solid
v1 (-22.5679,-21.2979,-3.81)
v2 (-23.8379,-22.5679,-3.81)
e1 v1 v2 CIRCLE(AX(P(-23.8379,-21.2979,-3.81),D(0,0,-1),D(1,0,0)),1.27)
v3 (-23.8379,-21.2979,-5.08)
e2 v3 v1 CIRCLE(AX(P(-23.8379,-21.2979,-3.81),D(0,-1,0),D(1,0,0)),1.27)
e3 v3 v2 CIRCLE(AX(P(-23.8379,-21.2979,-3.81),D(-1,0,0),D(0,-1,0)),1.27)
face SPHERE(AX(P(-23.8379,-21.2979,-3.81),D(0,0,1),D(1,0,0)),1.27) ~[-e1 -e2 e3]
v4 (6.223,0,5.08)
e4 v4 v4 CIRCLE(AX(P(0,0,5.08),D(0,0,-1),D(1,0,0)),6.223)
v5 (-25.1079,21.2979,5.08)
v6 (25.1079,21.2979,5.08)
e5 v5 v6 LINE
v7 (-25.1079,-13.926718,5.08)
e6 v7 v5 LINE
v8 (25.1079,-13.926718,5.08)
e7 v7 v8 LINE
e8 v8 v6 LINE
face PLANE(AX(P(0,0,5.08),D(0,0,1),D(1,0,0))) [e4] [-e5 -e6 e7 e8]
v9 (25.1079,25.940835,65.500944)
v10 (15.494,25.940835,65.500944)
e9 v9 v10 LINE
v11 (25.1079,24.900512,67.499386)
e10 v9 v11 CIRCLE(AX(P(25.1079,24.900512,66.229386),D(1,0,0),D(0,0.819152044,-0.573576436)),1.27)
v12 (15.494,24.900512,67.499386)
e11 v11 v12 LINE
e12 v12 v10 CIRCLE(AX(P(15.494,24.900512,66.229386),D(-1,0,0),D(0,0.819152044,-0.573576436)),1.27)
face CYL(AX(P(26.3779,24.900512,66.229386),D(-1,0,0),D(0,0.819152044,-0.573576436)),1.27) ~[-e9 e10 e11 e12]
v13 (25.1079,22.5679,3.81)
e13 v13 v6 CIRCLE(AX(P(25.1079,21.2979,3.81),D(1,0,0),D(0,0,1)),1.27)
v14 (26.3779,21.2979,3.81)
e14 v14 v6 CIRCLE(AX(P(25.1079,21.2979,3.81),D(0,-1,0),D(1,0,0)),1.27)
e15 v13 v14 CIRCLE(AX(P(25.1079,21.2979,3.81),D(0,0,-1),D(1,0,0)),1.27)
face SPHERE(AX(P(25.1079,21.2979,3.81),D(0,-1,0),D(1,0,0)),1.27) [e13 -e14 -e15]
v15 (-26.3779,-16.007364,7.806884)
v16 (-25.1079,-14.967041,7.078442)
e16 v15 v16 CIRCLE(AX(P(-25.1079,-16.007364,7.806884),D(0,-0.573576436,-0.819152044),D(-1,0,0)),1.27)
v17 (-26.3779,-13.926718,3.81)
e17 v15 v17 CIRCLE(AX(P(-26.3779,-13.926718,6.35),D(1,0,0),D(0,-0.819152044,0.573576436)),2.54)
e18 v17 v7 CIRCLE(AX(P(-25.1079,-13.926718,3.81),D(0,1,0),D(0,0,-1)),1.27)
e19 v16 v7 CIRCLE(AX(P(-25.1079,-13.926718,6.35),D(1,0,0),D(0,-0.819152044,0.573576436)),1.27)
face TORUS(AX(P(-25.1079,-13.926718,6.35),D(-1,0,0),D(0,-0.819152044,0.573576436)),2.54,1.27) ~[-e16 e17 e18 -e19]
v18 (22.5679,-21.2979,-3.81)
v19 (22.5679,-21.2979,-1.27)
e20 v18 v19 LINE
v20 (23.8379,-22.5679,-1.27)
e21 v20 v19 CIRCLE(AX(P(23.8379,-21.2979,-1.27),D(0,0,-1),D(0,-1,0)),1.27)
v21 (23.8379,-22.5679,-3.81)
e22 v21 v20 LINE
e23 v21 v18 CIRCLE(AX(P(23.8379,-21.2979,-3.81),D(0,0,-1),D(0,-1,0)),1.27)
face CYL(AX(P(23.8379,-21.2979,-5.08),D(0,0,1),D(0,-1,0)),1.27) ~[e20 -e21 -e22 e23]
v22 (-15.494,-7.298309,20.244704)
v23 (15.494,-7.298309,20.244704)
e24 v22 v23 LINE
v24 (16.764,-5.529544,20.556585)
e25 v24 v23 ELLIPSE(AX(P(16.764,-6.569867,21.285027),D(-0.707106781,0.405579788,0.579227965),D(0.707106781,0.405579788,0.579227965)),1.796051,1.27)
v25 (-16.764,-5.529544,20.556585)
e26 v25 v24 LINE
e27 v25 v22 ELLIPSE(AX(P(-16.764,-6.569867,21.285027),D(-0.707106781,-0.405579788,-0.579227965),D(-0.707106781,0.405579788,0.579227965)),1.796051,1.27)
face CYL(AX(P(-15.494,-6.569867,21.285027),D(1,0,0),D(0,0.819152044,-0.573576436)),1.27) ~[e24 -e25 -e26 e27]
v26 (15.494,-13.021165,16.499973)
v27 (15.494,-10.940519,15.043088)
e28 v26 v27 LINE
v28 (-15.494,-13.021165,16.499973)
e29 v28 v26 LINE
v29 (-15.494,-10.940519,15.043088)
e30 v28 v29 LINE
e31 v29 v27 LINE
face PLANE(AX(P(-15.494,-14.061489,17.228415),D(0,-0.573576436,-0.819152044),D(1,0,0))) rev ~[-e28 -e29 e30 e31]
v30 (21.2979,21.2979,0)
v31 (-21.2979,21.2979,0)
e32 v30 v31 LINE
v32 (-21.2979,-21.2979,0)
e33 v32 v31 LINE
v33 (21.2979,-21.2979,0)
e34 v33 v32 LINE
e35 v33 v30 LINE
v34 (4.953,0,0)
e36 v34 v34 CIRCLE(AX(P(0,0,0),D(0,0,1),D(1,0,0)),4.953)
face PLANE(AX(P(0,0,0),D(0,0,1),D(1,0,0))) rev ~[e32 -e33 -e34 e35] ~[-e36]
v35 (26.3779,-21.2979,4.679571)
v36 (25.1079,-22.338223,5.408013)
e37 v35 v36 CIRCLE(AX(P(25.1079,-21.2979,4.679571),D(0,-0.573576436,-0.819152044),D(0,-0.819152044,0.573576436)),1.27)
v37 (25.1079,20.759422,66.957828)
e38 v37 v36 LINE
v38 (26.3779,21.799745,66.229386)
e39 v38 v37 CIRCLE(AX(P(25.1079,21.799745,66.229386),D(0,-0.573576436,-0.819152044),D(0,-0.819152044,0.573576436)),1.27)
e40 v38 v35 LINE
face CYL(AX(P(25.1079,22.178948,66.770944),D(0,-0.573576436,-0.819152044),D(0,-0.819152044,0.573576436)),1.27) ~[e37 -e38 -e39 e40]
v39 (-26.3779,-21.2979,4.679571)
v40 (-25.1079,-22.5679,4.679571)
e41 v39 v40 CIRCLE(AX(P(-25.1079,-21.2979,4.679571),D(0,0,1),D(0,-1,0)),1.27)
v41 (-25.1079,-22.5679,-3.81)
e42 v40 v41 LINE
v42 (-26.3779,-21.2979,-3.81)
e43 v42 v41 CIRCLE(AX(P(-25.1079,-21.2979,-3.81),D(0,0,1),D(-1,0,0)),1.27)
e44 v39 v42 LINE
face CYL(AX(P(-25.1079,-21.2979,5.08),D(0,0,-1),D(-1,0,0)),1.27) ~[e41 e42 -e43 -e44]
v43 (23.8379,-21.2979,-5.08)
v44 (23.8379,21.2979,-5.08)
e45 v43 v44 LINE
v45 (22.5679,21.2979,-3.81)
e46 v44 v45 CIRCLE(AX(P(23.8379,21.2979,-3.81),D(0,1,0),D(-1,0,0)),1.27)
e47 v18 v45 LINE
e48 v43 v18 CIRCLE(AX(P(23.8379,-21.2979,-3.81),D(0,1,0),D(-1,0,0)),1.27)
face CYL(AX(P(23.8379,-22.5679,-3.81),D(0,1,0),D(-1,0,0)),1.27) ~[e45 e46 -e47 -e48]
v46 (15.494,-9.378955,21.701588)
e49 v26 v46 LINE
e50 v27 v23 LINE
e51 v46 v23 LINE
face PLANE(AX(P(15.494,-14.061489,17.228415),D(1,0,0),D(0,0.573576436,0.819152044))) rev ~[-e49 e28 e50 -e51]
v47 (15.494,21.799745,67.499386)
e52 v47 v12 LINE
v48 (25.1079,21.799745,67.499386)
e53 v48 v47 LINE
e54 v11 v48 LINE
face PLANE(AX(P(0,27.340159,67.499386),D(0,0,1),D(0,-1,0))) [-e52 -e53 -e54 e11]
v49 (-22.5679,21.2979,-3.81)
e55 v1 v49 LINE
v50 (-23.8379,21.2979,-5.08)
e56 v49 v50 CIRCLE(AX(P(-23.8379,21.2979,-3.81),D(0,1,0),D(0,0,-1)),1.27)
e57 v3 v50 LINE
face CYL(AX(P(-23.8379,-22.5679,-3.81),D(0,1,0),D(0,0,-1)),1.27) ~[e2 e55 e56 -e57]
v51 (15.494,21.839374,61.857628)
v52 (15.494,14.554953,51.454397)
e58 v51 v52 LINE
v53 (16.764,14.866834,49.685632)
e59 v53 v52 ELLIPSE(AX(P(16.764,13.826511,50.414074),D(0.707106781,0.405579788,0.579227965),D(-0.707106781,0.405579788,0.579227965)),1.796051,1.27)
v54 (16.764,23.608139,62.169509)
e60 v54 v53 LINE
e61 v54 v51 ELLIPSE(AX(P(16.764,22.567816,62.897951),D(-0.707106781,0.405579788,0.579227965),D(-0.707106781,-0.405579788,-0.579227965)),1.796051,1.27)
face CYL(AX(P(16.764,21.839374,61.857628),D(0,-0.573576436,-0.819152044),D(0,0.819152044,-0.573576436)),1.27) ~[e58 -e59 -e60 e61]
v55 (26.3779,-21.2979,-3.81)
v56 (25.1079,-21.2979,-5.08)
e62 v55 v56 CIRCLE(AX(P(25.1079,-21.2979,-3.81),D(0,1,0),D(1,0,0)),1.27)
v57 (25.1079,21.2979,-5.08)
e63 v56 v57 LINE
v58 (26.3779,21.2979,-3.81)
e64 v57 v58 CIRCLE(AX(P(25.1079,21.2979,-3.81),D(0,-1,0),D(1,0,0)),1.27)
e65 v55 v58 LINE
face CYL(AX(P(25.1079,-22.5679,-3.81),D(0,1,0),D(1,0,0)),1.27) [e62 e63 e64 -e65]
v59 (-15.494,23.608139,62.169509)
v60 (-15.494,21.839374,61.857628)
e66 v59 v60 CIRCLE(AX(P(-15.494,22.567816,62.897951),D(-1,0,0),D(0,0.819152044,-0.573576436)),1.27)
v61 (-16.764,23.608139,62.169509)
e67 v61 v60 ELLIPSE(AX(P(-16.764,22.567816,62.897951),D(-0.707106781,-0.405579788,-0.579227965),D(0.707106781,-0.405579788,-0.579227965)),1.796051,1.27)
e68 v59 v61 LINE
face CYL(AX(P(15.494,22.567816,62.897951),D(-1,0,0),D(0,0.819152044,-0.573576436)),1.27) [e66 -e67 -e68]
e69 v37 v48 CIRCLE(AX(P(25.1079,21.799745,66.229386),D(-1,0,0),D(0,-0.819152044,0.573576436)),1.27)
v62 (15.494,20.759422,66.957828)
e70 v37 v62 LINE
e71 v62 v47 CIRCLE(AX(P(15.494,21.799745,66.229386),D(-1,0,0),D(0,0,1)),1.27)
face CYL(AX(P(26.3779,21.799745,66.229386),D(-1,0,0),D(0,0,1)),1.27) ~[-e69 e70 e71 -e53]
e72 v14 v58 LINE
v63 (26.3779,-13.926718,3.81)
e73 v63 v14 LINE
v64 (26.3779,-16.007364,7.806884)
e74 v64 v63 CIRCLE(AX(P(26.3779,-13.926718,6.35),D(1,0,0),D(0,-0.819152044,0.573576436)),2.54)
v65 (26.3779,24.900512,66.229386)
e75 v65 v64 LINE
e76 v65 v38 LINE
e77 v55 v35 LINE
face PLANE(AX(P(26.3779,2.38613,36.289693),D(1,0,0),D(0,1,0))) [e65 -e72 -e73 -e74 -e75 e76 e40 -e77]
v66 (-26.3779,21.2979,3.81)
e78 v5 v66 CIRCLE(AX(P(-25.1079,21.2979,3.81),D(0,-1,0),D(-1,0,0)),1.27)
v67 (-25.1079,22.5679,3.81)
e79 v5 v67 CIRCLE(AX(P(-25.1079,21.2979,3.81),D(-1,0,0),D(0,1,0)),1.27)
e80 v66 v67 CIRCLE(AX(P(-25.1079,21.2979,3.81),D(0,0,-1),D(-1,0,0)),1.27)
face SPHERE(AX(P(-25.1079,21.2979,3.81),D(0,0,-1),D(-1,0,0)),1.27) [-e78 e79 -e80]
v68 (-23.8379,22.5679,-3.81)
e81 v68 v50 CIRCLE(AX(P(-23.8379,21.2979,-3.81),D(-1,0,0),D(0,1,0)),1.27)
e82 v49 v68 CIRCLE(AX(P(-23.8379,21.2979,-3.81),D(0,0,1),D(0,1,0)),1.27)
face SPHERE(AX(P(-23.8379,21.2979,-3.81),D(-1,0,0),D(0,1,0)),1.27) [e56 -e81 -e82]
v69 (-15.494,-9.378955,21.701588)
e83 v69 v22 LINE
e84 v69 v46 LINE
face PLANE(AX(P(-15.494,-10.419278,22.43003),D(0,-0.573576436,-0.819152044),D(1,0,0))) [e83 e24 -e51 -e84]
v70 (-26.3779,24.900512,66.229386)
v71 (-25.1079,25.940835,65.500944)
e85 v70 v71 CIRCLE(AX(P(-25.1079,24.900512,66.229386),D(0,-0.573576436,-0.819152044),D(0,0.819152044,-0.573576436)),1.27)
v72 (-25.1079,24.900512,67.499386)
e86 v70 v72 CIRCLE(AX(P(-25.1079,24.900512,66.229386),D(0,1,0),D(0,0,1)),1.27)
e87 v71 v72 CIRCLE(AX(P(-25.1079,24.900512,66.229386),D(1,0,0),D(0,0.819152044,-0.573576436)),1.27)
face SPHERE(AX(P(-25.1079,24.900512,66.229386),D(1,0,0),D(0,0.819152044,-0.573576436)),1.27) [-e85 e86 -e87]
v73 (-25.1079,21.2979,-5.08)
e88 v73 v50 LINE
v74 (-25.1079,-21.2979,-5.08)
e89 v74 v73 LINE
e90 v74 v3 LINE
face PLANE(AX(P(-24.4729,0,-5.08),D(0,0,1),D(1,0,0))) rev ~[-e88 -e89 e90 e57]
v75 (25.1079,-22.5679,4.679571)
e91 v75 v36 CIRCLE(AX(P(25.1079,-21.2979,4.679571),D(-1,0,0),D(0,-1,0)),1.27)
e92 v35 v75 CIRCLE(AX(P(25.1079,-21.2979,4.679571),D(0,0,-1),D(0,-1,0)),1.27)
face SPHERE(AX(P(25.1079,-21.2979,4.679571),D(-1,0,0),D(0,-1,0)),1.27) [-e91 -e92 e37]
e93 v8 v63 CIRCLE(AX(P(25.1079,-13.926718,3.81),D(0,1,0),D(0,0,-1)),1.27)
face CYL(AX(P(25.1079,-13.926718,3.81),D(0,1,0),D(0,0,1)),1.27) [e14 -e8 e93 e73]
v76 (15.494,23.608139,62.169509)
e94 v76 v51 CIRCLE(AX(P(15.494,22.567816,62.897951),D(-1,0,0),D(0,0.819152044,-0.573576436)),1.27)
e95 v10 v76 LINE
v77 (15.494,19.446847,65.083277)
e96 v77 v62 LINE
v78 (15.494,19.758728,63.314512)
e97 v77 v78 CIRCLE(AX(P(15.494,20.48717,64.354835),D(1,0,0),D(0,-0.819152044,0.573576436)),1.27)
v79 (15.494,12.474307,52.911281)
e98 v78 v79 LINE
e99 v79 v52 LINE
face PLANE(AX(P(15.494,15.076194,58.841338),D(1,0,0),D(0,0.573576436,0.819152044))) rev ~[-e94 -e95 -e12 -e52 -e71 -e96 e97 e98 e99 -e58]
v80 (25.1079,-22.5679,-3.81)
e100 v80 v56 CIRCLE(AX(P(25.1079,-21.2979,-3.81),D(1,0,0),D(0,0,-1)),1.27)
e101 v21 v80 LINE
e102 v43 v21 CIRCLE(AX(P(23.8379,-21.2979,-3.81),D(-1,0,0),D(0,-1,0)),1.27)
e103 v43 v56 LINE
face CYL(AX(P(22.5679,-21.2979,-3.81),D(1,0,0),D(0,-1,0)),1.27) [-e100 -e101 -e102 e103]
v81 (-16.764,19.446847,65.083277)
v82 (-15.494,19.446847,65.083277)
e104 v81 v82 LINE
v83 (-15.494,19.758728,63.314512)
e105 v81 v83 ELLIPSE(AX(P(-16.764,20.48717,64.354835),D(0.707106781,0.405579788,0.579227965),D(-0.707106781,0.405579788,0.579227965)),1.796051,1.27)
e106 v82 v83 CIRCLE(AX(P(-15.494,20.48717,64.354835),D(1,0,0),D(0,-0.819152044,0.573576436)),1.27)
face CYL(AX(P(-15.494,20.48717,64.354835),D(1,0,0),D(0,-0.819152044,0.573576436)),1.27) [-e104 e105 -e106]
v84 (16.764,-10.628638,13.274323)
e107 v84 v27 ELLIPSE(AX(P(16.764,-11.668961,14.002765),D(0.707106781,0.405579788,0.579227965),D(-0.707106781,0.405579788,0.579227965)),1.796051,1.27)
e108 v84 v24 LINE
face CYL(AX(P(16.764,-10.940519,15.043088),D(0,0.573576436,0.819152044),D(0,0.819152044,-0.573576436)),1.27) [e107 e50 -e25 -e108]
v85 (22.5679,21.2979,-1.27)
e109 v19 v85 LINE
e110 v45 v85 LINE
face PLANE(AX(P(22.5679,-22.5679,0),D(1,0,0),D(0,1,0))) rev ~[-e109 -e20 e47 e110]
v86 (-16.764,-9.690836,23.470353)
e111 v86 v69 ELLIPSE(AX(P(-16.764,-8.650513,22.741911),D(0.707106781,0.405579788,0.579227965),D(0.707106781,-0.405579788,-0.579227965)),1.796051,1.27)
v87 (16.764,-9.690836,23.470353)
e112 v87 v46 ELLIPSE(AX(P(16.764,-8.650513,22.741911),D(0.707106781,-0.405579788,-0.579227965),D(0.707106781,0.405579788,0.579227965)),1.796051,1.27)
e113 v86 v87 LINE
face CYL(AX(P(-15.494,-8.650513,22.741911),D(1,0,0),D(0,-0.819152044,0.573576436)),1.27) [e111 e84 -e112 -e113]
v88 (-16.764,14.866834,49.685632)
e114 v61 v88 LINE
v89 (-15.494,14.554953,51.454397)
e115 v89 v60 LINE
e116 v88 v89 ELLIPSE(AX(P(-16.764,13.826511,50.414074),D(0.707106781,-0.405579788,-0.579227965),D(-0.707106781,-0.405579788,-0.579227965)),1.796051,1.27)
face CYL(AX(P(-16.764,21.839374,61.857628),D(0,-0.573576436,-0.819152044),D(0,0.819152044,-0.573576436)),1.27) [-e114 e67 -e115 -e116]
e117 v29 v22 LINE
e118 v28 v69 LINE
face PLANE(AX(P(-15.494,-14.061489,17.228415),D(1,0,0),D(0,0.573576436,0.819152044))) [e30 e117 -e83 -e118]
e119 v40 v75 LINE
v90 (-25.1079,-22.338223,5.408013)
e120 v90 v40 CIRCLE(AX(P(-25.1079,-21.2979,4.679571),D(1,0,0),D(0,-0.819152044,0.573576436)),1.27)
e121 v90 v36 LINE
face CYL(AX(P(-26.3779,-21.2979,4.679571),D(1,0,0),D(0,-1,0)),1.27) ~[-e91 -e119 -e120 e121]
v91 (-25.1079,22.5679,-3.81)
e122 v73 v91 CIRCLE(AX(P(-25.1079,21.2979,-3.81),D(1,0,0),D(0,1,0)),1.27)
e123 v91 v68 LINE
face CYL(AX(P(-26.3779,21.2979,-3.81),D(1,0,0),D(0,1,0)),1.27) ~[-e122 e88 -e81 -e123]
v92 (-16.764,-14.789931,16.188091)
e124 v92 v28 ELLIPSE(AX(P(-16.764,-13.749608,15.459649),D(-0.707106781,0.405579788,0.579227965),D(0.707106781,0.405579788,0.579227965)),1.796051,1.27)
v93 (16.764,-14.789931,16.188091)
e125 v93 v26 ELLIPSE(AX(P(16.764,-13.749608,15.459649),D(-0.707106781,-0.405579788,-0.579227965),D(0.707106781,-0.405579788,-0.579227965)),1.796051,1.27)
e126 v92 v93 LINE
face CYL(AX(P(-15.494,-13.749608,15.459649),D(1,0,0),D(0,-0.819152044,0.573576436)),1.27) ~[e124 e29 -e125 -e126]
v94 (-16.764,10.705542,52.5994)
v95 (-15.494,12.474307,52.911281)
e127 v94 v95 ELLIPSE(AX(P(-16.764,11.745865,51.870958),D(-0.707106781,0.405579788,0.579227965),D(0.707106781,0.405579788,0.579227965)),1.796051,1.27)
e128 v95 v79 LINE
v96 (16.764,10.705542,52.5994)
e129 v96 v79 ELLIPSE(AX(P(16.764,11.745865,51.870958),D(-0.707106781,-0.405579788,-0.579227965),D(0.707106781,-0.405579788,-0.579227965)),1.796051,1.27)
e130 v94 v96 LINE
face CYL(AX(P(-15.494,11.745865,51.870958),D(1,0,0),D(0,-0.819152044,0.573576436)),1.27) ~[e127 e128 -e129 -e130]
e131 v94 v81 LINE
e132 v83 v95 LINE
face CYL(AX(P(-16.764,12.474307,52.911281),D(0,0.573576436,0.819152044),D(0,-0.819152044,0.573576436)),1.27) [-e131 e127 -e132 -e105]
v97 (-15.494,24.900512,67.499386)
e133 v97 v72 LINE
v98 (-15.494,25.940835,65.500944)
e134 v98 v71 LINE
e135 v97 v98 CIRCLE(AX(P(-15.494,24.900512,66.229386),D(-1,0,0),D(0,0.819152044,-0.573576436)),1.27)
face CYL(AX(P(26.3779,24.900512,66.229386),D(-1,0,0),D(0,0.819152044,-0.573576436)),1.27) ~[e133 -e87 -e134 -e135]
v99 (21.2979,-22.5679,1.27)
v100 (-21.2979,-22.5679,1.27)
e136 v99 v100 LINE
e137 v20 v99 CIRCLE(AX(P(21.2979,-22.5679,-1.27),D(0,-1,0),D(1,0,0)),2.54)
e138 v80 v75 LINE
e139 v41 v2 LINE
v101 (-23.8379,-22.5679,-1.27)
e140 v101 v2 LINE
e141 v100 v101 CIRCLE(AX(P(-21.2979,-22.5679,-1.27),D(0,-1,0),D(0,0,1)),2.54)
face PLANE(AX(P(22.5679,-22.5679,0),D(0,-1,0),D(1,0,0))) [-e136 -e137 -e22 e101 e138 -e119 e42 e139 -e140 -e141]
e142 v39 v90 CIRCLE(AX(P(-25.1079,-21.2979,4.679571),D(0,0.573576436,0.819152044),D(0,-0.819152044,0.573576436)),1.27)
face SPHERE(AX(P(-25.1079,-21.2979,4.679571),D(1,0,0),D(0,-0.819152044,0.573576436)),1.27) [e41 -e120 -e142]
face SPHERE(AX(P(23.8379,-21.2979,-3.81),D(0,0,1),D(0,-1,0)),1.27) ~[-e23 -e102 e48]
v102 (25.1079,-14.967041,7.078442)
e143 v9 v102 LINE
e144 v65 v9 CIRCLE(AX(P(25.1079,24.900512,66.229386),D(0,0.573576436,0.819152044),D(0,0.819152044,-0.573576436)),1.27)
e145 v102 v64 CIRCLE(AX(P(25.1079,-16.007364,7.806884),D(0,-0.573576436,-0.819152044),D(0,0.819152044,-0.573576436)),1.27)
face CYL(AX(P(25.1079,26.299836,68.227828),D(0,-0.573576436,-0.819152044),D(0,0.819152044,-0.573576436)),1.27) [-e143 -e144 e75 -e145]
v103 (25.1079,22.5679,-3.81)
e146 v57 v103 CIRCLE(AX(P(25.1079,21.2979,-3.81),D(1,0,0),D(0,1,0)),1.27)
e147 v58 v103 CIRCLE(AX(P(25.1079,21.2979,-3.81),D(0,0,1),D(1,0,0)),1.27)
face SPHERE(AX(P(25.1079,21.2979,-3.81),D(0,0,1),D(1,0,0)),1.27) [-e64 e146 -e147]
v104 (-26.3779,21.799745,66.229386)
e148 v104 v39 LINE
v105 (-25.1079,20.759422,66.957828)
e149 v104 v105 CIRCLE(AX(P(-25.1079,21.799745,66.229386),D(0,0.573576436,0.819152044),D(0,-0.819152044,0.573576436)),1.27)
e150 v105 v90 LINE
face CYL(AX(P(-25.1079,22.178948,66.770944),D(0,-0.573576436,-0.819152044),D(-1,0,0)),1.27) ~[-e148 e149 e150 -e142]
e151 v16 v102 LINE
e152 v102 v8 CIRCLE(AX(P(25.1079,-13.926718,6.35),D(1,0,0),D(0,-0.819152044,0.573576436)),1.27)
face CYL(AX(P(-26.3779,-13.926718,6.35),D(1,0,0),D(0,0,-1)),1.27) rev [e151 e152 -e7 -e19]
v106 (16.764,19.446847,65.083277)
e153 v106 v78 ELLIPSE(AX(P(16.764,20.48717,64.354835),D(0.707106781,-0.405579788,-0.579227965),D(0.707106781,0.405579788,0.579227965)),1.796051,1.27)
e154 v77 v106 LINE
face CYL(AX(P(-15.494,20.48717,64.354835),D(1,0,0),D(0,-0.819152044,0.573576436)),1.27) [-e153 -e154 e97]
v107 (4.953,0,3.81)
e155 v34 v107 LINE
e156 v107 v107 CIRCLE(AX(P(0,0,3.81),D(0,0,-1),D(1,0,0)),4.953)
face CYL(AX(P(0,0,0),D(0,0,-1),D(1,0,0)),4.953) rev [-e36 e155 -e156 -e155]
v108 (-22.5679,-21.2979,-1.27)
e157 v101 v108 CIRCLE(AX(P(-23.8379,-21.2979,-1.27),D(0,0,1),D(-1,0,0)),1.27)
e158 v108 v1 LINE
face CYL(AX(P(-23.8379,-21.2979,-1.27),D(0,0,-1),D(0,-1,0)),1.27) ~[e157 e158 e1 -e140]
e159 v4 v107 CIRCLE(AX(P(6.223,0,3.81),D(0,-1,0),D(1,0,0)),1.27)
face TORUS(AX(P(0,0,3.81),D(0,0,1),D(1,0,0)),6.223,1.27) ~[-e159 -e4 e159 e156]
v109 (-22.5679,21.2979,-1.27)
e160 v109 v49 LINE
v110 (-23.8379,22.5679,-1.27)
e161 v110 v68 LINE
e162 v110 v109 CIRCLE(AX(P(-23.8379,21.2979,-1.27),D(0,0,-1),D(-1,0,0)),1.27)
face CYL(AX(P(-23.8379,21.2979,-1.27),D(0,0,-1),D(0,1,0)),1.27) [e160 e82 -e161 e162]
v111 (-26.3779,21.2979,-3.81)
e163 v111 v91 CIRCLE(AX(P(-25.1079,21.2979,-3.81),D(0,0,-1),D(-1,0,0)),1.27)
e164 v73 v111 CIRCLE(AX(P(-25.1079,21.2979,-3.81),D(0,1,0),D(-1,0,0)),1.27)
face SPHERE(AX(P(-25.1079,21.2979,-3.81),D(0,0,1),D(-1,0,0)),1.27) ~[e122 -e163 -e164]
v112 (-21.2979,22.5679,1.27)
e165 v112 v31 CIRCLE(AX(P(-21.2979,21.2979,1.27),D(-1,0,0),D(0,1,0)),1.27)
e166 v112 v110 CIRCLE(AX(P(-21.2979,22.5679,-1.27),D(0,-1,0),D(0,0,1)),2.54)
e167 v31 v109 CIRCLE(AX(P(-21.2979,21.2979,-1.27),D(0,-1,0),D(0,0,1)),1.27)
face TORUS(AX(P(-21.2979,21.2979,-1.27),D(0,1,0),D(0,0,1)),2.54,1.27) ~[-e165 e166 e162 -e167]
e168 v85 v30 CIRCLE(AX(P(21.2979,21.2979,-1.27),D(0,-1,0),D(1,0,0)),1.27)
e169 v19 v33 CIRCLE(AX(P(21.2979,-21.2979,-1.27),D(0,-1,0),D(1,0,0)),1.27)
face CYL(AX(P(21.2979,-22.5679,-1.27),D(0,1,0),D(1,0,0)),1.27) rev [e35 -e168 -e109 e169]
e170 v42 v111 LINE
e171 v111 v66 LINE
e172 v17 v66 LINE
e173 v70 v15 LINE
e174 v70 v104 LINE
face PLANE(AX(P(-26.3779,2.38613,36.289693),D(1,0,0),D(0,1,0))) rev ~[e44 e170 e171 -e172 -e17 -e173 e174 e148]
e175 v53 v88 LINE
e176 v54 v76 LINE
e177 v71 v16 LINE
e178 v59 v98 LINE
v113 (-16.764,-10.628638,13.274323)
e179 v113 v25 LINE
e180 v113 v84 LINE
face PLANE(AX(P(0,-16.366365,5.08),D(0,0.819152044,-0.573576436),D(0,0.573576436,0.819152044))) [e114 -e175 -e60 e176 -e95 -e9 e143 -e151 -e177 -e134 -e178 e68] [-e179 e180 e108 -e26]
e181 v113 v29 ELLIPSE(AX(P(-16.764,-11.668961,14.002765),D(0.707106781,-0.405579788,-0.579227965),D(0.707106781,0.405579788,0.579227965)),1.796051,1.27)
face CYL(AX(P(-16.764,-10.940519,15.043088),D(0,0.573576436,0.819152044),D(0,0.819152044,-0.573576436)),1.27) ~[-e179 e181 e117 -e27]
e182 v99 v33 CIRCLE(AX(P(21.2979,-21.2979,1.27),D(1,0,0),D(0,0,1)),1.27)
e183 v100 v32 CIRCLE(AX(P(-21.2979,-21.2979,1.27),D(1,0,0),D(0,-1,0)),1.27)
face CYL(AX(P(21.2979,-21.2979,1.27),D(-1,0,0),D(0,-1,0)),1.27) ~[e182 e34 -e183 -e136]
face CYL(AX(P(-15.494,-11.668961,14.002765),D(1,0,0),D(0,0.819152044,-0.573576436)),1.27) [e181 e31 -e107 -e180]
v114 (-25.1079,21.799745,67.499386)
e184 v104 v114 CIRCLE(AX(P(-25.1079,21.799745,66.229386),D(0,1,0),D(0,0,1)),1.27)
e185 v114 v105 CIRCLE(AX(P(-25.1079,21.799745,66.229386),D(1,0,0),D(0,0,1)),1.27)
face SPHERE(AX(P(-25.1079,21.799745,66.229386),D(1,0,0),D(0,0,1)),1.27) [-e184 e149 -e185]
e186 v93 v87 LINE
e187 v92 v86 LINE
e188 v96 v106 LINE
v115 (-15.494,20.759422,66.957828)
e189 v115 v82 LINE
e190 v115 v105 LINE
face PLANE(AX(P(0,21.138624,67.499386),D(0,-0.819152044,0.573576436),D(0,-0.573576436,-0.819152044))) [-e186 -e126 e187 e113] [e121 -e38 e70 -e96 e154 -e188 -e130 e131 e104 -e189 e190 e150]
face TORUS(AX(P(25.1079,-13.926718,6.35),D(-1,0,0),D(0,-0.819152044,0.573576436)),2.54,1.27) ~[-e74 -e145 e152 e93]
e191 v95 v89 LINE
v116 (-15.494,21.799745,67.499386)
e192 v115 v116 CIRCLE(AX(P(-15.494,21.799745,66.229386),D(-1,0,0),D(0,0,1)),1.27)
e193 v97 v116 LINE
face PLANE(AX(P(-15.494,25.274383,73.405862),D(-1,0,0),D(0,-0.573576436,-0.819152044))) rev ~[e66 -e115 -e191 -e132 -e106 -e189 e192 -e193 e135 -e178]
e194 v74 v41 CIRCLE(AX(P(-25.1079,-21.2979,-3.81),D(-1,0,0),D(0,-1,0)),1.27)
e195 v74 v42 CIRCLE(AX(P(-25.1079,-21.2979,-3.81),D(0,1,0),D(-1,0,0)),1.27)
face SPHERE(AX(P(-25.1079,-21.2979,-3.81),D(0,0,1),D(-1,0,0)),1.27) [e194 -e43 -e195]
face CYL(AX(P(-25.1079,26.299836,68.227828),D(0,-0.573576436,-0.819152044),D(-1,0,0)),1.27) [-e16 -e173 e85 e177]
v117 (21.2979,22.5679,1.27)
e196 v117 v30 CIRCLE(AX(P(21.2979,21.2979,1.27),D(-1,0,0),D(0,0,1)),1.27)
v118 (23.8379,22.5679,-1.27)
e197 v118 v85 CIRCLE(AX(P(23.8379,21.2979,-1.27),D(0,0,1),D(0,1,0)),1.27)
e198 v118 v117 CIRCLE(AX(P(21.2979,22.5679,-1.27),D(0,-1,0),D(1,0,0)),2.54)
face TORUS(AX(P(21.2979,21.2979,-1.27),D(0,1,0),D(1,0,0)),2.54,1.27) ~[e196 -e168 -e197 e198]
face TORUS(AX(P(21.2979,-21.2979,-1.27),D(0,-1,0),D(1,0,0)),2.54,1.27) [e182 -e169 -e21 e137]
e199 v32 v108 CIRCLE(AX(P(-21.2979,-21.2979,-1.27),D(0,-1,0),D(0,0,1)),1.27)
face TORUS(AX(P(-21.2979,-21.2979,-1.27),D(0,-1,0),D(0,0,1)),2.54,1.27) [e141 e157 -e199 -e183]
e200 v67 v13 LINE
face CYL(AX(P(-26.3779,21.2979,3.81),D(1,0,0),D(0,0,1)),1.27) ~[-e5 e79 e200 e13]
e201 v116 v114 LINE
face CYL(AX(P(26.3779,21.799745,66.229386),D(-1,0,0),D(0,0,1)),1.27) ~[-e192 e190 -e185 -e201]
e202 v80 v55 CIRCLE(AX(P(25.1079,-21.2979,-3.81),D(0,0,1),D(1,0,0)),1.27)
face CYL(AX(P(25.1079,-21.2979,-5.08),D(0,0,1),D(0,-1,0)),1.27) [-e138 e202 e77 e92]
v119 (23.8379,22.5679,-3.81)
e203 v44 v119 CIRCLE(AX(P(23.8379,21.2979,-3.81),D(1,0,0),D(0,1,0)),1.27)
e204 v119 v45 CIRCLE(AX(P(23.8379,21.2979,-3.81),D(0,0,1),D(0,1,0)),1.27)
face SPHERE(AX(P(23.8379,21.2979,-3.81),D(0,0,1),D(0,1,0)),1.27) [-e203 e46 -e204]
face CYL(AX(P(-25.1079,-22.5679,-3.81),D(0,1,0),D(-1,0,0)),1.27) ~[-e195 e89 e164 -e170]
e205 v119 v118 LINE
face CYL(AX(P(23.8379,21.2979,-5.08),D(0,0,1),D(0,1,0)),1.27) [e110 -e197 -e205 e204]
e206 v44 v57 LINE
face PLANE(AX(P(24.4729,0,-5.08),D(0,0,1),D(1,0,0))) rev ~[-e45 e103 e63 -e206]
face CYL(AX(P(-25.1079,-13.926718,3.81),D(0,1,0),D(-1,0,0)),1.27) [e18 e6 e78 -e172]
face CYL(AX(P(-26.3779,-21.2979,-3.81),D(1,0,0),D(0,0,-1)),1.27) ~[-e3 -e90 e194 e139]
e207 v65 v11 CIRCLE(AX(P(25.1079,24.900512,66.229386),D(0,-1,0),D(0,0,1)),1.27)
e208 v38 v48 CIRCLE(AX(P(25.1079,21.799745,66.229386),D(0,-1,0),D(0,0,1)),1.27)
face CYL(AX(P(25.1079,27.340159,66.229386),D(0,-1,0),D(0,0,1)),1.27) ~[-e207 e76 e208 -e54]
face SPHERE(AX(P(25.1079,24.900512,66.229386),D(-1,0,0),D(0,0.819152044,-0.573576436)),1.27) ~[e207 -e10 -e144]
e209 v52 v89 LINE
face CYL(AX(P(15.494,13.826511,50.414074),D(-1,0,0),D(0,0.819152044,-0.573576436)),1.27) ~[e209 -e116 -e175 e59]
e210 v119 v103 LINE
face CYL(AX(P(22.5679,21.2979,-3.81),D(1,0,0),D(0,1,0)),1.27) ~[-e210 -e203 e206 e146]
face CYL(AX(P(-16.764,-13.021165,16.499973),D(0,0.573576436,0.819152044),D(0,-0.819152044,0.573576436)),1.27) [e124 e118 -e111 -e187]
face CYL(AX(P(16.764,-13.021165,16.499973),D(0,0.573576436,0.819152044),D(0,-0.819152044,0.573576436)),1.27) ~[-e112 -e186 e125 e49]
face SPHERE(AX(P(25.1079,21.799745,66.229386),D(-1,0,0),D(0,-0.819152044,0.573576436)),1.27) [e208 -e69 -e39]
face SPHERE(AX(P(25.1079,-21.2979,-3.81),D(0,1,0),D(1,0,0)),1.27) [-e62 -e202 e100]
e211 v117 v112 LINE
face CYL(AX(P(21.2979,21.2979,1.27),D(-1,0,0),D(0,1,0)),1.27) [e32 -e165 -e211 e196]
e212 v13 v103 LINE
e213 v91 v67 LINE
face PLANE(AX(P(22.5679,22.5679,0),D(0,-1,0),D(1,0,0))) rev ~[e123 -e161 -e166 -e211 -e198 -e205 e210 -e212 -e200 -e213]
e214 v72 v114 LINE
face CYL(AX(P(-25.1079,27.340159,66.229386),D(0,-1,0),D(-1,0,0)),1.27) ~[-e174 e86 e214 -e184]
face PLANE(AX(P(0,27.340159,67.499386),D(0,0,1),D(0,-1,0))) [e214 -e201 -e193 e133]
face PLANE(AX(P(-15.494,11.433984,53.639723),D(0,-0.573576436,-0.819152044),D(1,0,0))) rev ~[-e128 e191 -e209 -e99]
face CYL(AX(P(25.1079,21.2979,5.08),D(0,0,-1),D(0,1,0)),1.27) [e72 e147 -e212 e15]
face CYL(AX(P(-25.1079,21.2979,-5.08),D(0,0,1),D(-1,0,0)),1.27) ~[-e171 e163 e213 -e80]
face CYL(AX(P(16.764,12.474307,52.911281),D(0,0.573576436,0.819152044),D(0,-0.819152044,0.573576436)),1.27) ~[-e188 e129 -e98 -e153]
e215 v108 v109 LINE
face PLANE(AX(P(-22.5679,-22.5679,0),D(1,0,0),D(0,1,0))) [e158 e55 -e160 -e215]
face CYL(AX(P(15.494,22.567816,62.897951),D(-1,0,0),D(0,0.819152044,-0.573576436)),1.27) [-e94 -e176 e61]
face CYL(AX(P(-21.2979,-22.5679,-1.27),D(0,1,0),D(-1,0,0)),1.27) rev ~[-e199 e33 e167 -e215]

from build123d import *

# Parameters (mm, degrees)
F0_W      = 52.7558
F0_H      = 45.1358
F1_DEPTH  = 5.08
F2_W      = 3.81
F2_H      = 45.1358
F3_DEPTH  = 5.08
F4_R      = 4.953
F5_DEPTH  = 25.4
F7_DEPTH  = 26.3779
F8_W      = 30.988
F8_H      = 12.7
F9_DEPTH  = 46.7108254453
F10_W     = 30.988
F10_H     = 6.35
F11_DEPTH = 5.08
F12_F1_R  = 1.27
F12_F2_R  = 1.27
F13_W     = 30.988
F13_H     = 7.8715959617
F13_H_2   = 2.2884040383
F14_DEPTH = 25.4


with BuildPart() as f1:
    # F0 (on Top) → F1 (new body)
    with BuildSketch(Plane.XY):
        Rectangle(F0_W, F0_H)
    extrude(amount=F1_DEPTH)

    # F2 (on Top) → F3 (join)
    with BuildSketch(Plane.XY):
        with Locations((24.4729, 0)):
            Rectangle(F2_W, F2_H)
        with Locations((-24.4729, 0)):
            Rectangle(F2_W, F2_H)
    extrude(amount=-F3_DEPTH)

    # F4 (on Top) → F5 (cut)
    with BuildSketch(Plane.XY):
        Circle(F4_R)
    extrude(amount=F5_DEPTH, mode=Mode.SUBTRACT)

    # F6 (on Right) → F7 (join, symmetric)
    with BuildSketch(Plane.YZ):
        Polygon((21.1386244499, 67.4993857748), (-22.5679, 5.08), (-16.3663650891, 5.08), (27.3401593609, 67.4993857748), align=None)
    extrude(amount=F7_DEPTH, both=True)

    # F8 (on face) → F9 (cut, through all)
    with BuildSketch(Plane(origin=(0, -17.5301074531, 12.2747133843), x_dir=(1, 0, 0), z_dir=(0, -0.8191520443, 0.5735764364))):
        with Locations((0, 56.8473525345)):
            Rectangle(F8_W, F8_H)
    extrude(amount=-F9_DEPTH, mode=Mode.SUBTRACT)

    # F10 (on face) → F11 (cut, through all)
    with BuildSketch(Plane(origin=(0, -17.5301074531, 12.2747133843), x_dir=(1, 0, 0), z_dir=(0, -0.8191520443, 0.5735764364))):
        with Locations((0, 9.2223525345)):
            Rectangle(F10_W, F10_H)
    extrude(amount=-F11_DEPTH, mode=Mode.SUBTRACT)

    # F12: fillet of radius 1.27 on 49 edges, made by hand

    # F12_f1
    f12_f1_edges = [f1.edges().sort_by_distance(p)[0] for p in [
        (0, -16.3663650891, 5.08),
        (22.5679, 0, 0),
        (-22.5679, 0, 0),
    ]]
    fillet(f12_f1_edges, radius=F12_F1_R)

    # F12_f2
    f12_f2_edges = [f1.edges().sort_by_distance(p)[0] for p in [
        (26.3779, 4.3205911061, 5.08),
        (26.3779, 22.5679, 0),
        (26.3779, 0, -5.08),
        (26.3779, -22.5679, 0),
        (26.3779, -0.714637775, 36.2896928874),
        (26.3779, 24.2393919054, 67.4993857748),
        (26.3779, 6.1865592384, 37.2889139245),
        (-26.3779, 22.5679, 0),
        (-26.3779, 4.3205911061, 5.08),
        (-26.3779, 6.1865592384, 37.2889139245),
        (-26.3779, 24.2393919054, 67.4993857748),
        (-26.3779, -0.714637775, 36.2896928874),
        (-26.3779, -22.5679, 0),
        (-26.3779, 0, -5.08),
        (0, 21.1386244499, 67.4993857748),
        (0, -22.5679, 5.08),
        (0, 11.4339840588, 53.6397229441),
        (-15.494, 15.0761944297, 58.8413384253),
        (15.494, 15.0761944297, 58.8413384253),
        (0, 18.7184048005, 64.0429539066),
        (0, -14.061488537, 17.2284145755),
        (15.494, -12.2403833515, 19.8292223161),
        (0, -10.4192781661, 22.4300300567),
        (-15.494, -12.2403833515, 19.8292223161),
        (0, 27.3401593609, 67.4993857748),
        (-15.494, -8.0790909666, 16.9154540194),
        (0, -6.2579857811, 19.51626176),
        (15.494, -8.0790909666, 16.9154540194),
        (0, -9.900196152, 14.3146462788),
        (0, 15.5952764438, 50.7259546475),
        (15.494, 19.2374868147, 55.9275701287),
        (-15.494, 19.2374868147, 55.9275701287),
        (0, 22.8796971855, 61.1291856099),
        (0, 22.5679, 5.08),
        (-4.953, 0, 5.08),
        (-24.4729, 22.5679, -5.08),
        (-22.5679, 22.5679, -3.175),
        (0, 22.5679, 0),
        (22.5679, 22.5679, -3.175),
        (24.4729, 22.5679, -5.08),
        (-22.5679, -22.5679, -3.175),
        (-22.5679, 0, -5.08),
        (24.4729, -22.5679, -5.08),
        (22.5679, 0, -5.08),
        (-24.4729, -22.5679, -5.08),
        (0, -22.5679, 0),
        (-22.1959256121, -22.5679, -0.3719743879),
        (22.1959256121, -22.5679, -0.3719743879),
        (22.1959256121, 22.5679, -0.3719743879),
        (-22.1959256121, 22.5679, -0.3719743879),
        (-26.3779, -15.053221546, 5.7635792612),
        (26.3779, -15.053221546, 5.7635792612),
    ]]
    fillet(f12_f2_edges, radius=F12_F2_R)

    # F13 (on face) → F14 (cut)
    with BuildSketch(Plane(origin=(0, -17.5301074531, 12.2747133843), x_dir=(1, 0, 0), z_dir=(0, -0.8191520443, 0.5735764364))):
        with Locations((0, 70.6915545537)):
            Rectangle(F13_W, F13_H)
        with Locations((0, 65.6115545537)):
            Rectangle(F13_W, F13_H_2)
        Polygon((-15.494, 63.4007958817), (-15.494, 56.8473525345), (15.494, 56.8473525345), (15.494, 64.4673525345), (-15.494, 64.4673525345), align=None)
    extrude(amount=-F14_DEPTH, mode=Mode.SUBTRACT)


solid = f1.part
